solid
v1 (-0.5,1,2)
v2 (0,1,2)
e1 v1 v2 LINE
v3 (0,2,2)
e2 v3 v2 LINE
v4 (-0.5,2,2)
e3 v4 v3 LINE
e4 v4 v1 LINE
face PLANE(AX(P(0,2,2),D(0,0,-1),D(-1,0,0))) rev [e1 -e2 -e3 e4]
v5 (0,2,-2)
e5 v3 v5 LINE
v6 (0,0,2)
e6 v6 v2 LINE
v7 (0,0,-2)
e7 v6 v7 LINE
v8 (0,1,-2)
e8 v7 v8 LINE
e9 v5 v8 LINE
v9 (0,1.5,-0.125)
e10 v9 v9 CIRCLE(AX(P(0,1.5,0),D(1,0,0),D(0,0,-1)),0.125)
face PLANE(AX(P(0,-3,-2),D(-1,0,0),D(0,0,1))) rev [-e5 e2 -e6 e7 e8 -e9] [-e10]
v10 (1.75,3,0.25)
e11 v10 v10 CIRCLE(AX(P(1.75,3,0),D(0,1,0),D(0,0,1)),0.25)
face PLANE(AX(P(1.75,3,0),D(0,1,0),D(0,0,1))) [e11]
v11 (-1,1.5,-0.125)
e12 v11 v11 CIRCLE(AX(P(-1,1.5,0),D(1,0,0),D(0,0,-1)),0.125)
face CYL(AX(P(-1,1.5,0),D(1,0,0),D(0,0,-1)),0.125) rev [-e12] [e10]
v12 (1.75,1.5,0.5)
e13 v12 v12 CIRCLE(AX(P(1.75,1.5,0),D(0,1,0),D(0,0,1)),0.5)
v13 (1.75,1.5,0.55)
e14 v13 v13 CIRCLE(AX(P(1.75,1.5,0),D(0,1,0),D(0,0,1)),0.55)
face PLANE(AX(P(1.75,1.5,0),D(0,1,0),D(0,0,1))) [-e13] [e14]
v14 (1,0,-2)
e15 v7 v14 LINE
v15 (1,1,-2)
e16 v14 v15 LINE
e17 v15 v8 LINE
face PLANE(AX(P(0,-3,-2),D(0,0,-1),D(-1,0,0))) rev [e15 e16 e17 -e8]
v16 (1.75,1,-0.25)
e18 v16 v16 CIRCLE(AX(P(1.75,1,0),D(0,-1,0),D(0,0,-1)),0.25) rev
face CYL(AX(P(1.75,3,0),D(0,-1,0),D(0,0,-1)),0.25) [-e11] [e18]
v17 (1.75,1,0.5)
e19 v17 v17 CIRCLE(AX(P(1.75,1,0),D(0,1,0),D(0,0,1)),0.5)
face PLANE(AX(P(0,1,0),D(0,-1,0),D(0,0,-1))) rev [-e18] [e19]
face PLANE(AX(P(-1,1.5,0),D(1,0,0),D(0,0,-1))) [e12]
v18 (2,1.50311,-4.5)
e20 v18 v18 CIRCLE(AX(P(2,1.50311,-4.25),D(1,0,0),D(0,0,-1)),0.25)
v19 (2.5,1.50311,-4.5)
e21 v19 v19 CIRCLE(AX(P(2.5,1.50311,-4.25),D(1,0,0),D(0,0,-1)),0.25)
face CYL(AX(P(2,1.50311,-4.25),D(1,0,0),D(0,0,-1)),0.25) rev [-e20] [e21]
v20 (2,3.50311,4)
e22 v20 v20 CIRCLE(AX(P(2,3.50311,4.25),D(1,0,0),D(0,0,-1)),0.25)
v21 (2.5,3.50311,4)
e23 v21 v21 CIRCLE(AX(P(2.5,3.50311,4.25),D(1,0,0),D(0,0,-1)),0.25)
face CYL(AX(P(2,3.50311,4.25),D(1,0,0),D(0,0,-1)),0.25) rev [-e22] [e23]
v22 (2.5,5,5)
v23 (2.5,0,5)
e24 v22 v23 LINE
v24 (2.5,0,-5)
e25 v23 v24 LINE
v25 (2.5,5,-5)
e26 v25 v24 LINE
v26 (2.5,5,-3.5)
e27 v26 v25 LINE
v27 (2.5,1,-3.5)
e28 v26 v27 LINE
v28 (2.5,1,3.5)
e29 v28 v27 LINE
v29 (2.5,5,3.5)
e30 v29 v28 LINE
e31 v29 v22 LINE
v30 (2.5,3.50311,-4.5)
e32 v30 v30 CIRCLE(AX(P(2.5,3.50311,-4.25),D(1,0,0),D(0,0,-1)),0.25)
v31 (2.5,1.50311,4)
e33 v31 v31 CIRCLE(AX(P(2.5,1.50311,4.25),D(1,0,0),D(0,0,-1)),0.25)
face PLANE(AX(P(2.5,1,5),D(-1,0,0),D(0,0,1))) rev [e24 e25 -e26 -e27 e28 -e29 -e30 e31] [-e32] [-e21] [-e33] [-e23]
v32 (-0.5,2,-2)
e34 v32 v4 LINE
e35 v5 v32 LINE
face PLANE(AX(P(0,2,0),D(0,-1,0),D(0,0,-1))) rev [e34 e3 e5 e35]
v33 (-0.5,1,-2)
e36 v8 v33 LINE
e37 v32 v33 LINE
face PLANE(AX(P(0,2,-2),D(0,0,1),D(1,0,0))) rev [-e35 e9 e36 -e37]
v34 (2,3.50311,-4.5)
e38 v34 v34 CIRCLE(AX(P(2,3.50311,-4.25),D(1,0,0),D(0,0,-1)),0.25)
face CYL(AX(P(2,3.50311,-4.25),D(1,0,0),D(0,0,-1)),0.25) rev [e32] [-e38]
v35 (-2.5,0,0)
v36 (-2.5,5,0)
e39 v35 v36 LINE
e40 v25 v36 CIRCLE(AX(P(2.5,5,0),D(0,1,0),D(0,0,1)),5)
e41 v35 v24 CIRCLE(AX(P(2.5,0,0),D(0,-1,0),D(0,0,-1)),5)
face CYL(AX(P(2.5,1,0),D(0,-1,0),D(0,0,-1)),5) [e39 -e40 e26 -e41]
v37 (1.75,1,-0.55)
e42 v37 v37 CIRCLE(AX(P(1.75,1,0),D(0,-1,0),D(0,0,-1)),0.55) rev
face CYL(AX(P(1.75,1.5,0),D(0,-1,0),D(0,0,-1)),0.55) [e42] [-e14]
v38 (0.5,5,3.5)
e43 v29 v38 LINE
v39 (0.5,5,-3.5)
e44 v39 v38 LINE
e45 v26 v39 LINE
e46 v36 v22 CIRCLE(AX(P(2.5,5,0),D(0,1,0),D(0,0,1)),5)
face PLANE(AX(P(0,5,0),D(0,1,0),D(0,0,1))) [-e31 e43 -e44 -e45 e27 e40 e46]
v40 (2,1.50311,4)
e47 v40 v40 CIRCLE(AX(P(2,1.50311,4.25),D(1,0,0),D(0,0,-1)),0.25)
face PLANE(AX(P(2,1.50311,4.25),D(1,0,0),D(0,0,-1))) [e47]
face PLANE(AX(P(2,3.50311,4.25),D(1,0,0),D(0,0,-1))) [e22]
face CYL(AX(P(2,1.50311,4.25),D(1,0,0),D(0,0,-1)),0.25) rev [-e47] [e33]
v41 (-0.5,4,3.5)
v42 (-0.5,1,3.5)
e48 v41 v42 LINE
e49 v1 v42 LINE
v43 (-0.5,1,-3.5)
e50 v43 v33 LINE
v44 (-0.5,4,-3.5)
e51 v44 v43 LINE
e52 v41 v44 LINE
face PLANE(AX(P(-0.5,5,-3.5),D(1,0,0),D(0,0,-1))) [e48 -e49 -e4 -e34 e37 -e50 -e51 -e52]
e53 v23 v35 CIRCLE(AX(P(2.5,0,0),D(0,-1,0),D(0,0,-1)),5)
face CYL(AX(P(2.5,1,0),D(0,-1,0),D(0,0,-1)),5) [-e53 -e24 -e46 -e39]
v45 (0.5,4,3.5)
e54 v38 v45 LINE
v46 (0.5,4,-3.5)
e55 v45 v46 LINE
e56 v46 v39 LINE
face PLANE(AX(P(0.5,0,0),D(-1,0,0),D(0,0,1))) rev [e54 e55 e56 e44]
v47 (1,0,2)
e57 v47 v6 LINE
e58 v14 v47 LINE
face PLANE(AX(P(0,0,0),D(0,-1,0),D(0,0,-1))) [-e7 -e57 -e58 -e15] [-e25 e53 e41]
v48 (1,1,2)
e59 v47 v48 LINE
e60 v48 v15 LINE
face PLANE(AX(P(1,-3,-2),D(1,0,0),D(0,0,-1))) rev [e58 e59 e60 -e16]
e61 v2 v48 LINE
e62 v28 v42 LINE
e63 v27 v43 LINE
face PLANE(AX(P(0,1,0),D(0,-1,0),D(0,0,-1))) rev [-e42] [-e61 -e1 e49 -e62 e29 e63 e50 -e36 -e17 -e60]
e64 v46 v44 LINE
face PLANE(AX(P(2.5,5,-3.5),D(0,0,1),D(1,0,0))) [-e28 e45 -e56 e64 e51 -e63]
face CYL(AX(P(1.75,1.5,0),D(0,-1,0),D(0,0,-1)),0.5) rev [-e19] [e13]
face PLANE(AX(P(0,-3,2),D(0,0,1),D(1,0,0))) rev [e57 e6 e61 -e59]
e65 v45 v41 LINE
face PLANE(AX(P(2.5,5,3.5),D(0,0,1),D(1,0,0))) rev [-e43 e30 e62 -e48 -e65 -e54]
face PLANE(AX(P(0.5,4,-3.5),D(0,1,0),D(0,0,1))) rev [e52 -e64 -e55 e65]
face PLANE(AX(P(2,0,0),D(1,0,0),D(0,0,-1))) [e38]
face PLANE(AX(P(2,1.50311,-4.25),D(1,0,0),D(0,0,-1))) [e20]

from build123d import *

# Parameters (mm, degrees)
SZKIC1_W                    = 5
SZKIC1_H                    = 10
DODANIE_WYCI_GNI_CIE1_DEPTH = 1
DODANIE_WYCI_GNI_CIE4_DEPTH = 4
ZAOKR_GLENIE2_R             = 5
SZKIC3_W                    = 1
SZKIC3_H                    = 4
WYTNIJ_WYCI_GNI_CIE1_DEPTH  = 4
SZKIC4_W                    = 0.5
SZKIC4_H                    = 4
DODANIE_WYCI_GNI_CIE5_DEPTH = 1
SZKIC5_R                    = 0.25
DODANIE_WYCI_GNI_CIE6_DEPTH = 2
SZKIC6_R                    = 0.55
SZKIC6_R_2                  = 0.5
DODANIE_WYCI_GNI_CIE7_DEPTH = 0.5
SZKIC7_W                    = 7
SZKIC7_H                    = 1
DODANIE_WYCI_GNI_CIE8_DEPTH = 1
SZKIC11_R                   = 0.25
WYTNIJ_WYCI_GNI_CIE2_DEPTH  = 0.5
SZKIC14_R                   = 0.125
WYTNIJ_WYCI_GNI_CIE3_DEPTH  = 1


with BuildPart() as part:
    # Szkic1 → Dodanie-wyciągnięcie1 (new body)
    with BuildSketch(Plane(origin=(0, 0, 0), x_dir=(1, 0, 0), z_dir=(0, 1, 0))):
        Rectangle(SZKIC1_W, SZKIC1_H)
    extrude(amount=DODANIE_WYCI_GNI_CIE1_DEPTH)

    # Szkic2 → Dodanie-wyciągnięcie4 (add)
    with BuildSketch(Plane(origin=(0, 1, 0), x_dir=(1, 0, 0), z_dir=(0, 1, 0))):
        Polygon((-2.5, 5), (2.5, 5), (2.5, 3.5), (-0.5, 3.5), (-0.5, -3.5), (2.5, -3.5), (2.5, -5), (-2.5, -5), align=None)
    extrude(amount=DODANIE_WYCI_GNI_CIE4_DEPTH)

    # Zaokrąglenie2
    zaokr_glenie2_edges = [part.edges().sort_by_distance(p)[0] for p in [
        (-2.5, 2.5, -5),
        (-2.5, 2.5, 5),
    ]]
    fillet(zaokr_glenie2_edges, radius=ZAOKR_GLENIE2_R - 0.0001)  # a hair under: the kernel refuses the full size

    # Szkic3 → Wytnij-wyciągnięcie1 (cut)
    with BuildSketch(Plane(origin=(0, 1, 0), x_dir=(1, 0, 0), z_dir=(0, 1, 0))):
        with Locations((0.5, 0)):
            Rectangle(SZKIC3_W, SZKIC3_H)
    extrude(amount=-WYTNIJ_WYCI_GNI_CIE1_DEPTH, mode=Mode.SUBTRACT)

    # Szkic4 → Dodanie-wyciągnięcie5 (add)
    with BuildSketch(Plane(origin=(0, 1, 0), x_dir=(1, 0, 0), z_dir=(0, 1, 0))):
        with Locations((-0.25, 0)):
            Rectangle(SZKIC4_W, SZKIC4_H)
    extrude(amount=DODANIE_WYCI_GNI_CIE5_DEPTH)

    # Szkic5 → Dodanie-wyciągnięcie6 (add)
    with BuildSketch(Plane(origin=(0, 1, 0), x_dir=(1, 0, 0), z_dir=(0, 1, 0))):
        with Locations(Location((1.75, 0, 0), (0, 0, 90))):
            Circle(SZKIC5_R)
    extrude(amount=DODANIE_WYCI_GNI_CIE6_DEPTH)

    # Szkic6 → Dodanie-wyciągnięcie7 (add)
    with BuildSketch(Plane(origin=(0, 1, 0), x_dir=(1, 0, 0), z_dir=(0, 1, 0))):
        with Locations(Location((1.75, 0, 0), (0, 0, 90))):
            Circle(SZKIC6_R)
        with Locations(Location((1.75, 0, 0), (0, 0, 270))):
            Circle(SZKIC6_R_2, mode=Mode.SUBTRACT)
    extrude(amount=DODANIE_WYCI_GNI_CIE7_DEPTH)

    # Szkic7 → Dodanie-wyciągnięcie8 (add)
    with BuildSketch(Plane(origin=(-0.5, 0, 0), x_dir=(0, 0, -1), z_dir=(1, 0, 0))):
        with Locations((0, 4.5)):
            Rectangle(SZKIC7_W, SZKIC7_H)
    extrude(amount=DODANIE_WYCI_GNI_CIE8_DEPTH)

    # Szkic11 → Wytnij-wyciągnięcie2 (cut)
    with BuildSketch(Plane(origin=(2.5, 0, 0), x_dir=(0, 0, -1), z_dir=(1, 0, 0))):
        with Locations((4.25, 3.503110499)):
            Circle(SZKIC11_R)
        with Locations((4.25, 1.503110499)):
            Circle(SZKIC11_R)
        with Locations((-4.25, 3.503110499)):
            Circle(SZKIC11_R)
        with Locations((-4.25, 1.503110499)):
            Circle(SZKIC11_R)
    extrude(amount=-WYTNIJ_WYCI_GNI_CIE2_DEPTH, mode=Mode.SUBTRACT)

    # Szkic14 → Wytnij-wyciągnięcie3 (cut)
    with BuildSketch(Plane(origin=(0, 0, 0), x_dir=(0, 0, -1), z_dir=(1, 0, 0))):
        with Locations((0, 1.5)):
            Circle(SZKIC14_R)
    extrude(amount=-WYTNIJ_WYCI_GNI_CIE3_DEPTH, mode=Mode.SUBTRACT)


solid = part.part
